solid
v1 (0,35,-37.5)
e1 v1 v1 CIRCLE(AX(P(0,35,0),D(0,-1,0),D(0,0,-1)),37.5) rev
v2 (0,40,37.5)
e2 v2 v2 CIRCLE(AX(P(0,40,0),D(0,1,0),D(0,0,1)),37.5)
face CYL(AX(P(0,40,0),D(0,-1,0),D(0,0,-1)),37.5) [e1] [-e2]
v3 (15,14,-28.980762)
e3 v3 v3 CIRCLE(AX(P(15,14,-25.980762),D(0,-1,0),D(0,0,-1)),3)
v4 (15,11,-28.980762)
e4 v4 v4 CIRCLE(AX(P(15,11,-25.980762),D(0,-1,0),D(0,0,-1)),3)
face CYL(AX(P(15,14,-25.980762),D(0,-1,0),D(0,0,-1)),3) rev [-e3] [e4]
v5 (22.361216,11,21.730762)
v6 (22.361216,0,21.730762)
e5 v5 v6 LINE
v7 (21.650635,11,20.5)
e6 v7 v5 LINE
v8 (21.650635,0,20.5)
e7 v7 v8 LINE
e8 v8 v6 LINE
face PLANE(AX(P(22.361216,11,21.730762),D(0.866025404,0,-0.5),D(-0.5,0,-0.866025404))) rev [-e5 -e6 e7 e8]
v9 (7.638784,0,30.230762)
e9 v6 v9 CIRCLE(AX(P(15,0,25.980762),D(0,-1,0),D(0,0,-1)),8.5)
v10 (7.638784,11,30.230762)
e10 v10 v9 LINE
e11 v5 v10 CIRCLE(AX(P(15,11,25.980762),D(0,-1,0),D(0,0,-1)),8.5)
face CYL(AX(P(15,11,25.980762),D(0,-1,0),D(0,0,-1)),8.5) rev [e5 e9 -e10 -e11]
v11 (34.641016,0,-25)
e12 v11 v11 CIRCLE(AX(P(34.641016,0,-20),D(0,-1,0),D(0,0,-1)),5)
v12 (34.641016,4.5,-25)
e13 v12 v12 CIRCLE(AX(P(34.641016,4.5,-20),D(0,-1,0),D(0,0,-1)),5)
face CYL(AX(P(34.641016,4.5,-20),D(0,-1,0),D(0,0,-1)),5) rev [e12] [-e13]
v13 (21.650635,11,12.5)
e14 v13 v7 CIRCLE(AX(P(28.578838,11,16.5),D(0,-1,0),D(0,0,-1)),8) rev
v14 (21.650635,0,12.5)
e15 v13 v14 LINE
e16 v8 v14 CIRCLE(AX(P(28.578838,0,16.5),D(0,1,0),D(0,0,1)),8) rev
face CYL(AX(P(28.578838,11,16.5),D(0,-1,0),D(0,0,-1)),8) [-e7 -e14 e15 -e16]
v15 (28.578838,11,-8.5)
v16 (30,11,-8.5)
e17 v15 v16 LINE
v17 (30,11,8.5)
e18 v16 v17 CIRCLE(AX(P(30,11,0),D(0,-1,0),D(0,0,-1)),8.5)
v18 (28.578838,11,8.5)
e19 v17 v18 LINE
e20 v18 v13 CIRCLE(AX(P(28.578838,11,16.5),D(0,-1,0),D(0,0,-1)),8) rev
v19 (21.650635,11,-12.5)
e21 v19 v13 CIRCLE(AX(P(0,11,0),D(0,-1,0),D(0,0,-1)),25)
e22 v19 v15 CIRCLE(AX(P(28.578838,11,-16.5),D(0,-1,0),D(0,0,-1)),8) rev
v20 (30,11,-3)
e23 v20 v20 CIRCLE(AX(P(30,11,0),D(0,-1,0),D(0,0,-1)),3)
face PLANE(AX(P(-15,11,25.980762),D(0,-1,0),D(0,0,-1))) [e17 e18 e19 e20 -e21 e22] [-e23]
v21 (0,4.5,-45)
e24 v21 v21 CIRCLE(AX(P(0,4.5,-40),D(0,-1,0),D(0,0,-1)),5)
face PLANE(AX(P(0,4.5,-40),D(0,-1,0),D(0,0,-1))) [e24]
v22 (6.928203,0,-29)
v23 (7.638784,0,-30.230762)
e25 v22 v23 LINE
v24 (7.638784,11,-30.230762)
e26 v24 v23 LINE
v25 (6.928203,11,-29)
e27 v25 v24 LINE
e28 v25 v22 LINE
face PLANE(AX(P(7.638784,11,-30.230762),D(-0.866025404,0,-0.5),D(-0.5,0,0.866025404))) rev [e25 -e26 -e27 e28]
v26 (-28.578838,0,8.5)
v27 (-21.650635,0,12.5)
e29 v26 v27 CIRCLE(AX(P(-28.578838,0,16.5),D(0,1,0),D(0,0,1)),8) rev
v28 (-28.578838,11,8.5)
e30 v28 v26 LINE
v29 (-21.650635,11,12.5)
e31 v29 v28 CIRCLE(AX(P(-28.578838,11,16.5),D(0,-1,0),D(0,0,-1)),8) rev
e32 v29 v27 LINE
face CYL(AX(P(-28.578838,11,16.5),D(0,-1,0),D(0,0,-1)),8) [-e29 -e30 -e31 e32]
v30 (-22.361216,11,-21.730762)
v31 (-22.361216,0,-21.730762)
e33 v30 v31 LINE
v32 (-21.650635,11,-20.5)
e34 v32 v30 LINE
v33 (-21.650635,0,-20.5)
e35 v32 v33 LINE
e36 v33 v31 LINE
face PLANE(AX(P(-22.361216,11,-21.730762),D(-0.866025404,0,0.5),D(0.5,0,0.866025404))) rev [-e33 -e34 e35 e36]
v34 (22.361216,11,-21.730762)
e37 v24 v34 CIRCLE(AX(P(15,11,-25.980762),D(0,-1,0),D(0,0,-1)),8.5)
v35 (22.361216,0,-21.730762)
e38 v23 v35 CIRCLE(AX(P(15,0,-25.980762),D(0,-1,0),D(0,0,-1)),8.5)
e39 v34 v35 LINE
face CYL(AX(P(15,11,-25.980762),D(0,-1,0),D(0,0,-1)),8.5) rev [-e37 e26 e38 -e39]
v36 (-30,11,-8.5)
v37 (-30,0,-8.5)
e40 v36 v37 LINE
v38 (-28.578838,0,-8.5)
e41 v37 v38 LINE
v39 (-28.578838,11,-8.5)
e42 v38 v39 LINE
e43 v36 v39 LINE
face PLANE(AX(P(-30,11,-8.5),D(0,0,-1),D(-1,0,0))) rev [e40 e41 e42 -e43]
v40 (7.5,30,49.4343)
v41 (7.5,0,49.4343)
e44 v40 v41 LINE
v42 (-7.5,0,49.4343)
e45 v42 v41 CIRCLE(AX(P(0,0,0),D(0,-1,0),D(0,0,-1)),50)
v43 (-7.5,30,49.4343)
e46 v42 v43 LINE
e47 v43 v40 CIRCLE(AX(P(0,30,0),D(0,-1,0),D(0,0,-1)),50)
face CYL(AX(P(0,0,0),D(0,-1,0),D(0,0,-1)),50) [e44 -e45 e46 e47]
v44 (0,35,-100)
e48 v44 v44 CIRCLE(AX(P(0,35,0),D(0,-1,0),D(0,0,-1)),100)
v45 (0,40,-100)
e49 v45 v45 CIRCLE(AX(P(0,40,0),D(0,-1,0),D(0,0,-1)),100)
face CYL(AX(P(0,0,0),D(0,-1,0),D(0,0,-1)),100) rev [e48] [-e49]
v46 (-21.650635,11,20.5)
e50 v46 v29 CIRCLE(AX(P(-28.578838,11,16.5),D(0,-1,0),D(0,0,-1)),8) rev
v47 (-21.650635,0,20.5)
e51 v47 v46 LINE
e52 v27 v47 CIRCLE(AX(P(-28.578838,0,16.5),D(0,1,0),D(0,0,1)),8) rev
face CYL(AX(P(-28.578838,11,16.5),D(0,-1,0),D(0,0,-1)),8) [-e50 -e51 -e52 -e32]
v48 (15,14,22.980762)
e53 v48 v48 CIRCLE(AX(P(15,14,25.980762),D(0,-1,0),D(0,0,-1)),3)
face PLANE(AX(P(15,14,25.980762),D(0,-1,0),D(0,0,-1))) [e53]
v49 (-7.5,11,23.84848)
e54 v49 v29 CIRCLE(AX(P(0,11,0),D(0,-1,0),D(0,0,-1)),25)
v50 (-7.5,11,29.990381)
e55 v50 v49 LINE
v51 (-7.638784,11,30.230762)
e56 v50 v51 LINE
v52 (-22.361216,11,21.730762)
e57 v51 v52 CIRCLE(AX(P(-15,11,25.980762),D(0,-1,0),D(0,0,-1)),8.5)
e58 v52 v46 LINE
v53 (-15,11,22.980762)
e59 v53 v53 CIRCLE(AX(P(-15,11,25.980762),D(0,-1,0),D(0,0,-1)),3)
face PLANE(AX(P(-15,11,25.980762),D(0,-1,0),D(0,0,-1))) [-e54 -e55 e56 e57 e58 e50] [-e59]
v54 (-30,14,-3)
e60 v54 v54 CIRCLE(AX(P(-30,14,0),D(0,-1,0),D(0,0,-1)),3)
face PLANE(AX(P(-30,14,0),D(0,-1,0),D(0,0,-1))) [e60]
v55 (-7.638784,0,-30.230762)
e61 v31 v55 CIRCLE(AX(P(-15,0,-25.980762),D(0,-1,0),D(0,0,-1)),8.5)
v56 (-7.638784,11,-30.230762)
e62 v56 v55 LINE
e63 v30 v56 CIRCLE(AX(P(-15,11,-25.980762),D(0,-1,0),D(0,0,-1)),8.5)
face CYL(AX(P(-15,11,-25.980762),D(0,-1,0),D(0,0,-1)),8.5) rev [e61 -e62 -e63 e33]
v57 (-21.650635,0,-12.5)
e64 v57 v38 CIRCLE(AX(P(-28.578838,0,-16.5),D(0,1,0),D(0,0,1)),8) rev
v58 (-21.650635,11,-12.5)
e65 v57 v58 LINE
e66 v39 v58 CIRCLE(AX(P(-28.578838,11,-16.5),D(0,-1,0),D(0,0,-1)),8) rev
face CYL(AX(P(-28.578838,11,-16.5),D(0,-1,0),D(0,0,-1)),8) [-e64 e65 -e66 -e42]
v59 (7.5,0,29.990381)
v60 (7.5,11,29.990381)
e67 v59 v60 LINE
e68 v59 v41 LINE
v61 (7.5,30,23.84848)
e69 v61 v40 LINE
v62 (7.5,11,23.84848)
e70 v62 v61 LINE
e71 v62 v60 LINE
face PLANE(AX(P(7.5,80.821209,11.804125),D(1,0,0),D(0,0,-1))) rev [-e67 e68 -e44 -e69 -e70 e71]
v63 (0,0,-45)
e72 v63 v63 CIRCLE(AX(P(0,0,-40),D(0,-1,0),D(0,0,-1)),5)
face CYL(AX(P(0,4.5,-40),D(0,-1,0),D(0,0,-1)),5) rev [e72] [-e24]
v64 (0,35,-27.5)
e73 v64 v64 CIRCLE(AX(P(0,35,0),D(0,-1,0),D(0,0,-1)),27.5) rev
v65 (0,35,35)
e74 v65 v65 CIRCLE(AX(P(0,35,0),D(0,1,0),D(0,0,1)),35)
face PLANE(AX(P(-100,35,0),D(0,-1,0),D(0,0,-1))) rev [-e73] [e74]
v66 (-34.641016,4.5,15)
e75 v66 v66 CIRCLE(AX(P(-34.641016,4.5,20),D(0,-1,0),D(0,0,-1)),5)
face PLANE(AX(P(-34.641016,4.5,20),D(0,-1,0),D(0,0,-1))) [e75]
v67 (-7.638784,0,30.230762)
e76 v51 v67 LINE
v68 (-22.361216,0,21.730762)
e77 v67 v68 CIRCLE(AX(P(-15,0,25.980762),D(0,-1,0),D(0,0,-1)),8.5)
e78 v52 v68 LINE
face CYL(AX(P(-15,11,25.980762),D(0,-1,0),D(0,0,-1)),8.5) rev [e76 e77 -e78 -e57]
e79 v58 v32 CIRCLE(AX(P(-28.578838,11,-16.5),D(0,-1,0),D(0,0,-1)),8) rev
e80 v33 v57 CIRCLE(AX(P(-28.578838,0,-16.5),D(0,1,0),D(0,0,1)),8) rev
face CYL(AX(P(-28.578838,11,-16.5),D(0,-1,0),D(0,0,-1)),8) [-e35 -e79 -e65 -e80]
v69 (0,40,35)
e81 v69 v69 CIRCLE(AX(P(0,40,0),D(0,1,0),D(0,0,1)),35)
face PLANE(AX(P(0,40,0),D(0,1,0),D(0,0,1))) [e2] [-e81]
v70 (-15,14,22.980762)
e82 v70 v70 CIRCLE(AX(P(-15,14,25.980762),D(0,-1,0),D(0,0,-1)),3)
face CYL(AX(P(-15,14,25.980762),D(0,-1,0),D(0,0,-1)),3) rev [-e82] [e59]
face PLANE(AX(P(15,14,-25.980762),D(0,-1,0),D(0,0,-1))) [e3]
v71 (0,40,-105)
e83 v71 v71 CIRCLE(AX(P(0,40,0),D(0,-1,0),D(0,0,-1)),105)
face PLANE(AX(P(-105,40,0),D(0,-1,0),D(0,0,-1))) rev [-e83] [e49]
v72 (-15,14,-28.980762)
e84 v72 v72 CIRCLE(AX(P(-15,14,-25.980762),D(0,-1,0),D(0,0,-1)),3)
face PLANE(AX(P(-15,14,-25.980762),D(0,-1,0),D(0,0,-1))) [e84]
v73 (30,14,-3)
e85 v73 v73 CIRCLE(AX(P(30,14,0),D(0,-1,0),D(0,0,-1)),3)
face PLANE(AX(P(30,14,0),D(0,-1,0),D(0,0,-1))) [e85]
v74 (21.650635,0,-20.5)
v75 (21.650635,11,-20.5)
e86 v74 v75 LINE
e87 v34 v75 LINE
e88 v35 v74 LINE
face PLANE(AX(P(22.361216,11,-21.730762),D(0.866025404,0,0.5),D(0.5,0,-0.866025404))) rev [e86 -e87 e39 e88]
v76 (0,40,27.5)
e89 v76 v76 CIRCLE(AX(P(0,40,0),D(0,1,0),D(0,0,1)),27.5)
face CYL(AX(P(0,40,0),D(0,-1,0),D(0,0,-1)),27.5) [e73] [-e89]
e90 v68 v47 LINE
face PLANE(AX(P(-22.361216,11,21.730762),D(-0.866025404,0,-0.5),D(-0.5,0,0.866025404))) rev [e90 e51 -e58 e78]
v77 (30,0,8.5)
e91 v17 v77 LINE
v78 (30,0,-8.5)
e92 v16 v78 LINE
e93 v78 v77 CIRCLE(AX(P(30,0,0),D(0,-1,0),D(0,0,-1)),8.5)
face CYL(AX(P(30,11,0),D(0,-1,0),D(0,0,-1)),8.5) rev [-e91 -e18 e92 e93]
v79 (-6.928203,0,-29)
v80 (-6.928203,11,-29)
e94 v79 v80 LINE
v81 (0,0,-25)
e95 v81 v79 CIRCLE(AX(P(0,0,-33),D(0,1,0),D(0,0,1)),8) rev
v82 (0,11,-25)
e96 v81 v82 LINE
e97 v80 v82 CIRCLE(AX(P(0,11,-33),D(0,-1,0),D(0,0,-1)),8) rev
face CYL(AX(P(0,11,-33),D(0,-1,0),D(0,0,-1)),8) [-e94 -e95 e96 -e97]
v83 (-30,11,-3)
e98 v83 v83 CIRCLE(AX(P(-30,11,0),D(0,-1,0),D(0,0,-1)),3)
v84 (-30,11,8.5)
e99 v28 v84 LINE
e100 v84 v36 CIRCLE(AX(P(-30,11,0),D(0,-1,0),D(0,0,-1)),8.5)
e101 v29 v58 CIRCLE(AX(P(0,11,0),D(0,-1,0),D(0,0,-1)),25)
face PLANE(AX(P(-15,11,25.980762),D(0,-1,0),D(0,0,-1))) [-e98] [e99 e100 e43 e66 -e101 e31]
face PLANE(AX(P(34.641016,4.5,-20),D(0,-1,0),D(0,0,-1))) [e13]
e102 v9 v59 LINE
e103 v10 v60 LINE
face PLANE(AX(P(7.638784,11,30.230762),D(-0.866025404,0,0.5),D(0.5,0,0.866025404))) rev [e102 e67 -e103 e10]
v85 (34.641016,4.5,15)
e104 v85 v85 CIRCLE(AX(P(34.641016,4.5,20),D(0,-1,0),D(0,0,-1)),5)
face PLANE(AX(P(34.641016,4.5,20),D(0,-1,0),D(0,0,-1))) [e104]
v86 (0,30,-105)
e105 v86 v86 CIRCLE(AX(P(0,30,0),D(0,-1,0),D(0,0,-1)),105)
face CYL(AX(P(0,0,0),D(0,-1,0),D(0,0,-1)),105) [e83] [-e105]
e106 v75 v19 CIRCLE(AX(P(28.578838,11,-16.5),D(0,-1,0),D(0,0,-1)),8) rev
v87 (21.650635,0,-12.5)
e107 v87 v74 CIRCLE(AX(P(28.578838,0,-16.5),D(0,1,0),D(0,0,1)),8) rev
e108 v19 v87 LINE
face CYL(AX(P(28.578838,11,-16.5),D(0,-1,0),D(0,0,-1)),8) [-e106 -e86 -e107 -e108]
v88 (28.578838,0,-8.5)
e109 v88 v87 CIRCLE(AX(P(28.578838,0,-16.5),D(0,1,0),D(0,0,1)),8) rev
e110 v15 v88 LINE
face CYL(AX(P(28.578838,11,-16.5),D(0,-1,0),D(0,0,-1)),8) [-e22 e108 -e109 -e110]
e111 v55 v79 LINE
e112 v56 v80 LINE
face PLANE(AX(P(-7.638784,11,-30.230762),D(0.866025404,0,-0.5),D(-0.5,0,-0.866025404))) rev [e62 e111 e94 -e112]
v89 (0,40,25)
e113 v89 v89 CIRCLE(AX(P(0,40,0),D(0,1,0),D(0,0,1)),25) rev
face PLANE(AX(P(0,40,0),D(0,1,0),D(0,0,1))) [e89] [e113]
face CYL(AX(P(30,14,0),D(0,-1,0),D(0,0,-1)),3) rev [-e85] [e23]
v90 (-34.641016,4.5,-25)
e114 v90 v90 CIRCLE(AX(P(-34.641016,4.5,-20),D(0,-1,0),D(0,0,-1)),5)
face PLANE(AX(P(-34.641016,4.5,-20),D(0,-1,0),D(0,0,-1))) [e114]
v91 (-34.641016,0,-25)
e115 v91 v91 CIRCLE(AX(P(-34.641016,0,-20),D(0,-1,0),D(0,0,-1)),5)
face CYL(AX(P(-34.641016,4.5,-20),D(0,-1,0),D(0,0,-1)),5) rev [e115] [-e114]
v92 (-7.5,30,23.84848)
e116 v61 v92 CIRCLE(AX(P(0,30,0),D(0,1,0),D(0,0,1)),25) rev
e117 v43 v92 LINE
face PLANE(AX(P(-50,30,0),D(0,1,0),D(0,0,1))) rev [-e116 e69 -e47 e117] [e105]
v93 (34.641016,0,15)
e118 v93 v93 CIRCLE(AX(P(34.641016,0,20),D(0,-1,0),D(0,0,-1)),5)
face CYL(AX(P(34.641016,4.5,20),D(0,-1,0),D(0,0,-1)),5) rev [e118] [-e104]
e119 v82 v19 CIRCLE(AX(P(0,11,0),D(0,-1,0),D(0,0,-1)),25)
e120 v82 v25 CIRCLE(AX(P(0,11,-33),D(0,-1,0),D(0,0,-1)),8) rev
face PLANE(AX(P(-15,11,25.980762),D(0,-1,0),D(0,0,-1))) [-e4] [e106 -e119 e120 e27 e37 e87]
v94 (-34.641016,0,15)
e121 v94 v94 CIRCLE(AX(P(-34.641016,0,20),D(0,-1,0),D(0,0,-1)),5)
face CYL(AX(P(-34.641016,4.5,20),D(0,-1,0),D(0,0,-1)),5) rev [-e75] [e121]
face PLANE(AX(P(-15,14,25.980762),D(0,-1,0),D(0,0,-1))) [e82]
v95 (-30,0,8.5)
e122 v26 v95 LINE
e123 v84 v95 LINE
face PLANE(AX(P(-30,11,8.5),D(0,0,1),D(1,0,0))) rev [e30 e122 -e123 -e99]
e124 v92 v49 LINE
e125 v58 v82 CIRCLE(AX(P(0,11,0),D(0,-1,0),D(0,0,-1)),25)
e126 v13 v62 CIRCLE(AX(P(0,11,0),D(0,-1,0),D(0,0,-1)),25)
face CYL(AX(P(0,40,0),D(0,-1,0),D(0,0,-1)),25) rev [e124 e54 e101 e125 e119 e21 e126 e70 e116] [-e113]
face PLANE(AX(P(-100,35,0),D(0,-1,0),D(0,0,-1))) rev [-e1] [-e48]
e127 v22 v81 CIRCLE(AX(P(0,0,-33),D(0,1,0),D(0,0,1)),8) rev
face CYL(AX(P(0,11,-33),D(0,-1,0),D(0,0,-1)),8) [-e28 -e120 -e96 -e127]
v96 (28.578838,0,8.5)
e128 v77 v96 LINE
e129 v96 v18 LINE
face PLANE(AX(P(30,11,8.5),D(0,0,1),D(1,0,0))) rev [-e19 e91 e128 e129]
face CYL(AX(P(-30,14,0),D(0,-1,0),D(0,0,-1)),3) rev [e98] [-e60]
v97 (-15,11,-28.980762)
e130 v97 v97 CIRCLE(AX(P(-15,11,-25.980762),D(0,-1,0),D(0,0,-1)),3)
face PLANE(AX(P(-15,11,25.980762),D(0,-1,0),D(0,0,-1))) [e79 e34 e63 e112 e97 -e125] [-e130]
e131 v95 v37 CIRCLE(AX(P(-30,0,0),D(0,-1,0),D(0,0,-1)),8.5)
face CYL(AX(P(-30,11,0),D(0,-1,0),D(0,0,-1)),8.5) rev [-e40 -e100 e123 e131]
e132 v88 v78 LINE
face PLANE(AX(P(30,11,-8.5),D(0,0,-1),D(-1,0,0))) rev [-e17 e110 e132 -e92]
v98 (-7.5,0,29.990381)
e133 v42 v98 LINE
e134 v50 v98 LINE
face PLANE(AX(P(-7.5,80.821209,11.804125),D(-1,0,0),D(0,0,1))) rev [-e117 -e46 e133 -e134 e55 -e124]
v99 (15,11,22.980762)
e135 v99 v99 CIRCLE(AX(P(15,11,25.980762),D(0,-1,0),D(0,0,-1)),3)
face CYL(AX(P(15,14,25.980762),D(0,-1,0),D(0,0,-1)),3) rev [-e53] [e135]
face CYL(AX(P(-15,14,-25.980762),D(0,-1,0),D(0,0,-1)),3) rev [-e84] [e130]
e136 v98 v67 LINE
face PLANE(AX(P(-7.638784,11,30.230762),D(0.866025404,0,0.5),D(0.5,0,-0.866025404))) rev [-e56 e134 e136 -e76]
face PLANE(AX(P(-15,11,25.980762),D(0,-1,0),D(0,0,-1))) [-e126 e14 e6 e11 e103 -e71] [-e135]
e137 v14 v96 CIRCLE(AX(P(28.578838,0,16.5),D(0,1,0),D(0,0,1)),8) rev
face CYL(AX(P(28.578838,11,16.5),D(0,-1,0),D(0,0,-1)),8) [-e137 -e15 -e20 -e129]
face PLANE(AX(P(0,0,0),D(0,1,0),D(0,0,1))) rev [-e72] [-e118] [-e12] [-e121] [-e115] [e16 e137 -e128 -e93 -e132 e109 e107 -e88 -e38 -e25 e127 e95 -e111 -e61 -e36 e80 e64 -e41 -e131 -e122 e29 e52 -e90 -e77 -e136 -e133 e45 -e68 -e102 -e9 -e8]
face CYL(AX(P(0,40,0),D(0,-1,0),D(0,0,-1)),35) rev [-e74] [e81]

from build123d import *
from build123d.topology import SkipClean

# Parameters (mm, degrees)
CUT_EXTRUDE1_DEPTH  = 11
FILLET1_R           = 8
SKETCH3_R           = 3
CUT_EXTRUDE2_DEPTH  = 3
SKETCH4_R           = 5
CUT_EXTRUDE3_DEPTH  = 4.5
SKETCH5_R           = 25
CUT_EXTRUDE4_DEPTH  = 152.297719745
SKETCH6_R           = 37.5
SKETCH6_R_2         = 35
SKETCH6_R_3         = 27.5
SKETCH6_R_4         = 25
BOSS_EXTRUDE1_DEPTH = 5
CUT_EXTRUDE5_START  = -30
CUT_EXTRUDE5_DEPTH  = 30


# Read off the part's stored shape, not the designer's step: Cut-Extrude5
with BuildPart() as part:
    # Sketch1 → Revolve1 (revolve)
    with BuildSketch(Plane.XY, mode=Mode.PRIVATE) as revolve1_sk:
        Polygon((0, 0), (-50, 0), (-50, 30), (-105, 30), (-105, 40), (-100, 40), (-100, 35), (0, 35), align=None)
    revolve(revolve1_sk.sketch.rotate(Axis((0, 0, 0), (0, 1, 0)), 270), axis=Axis((0, 0, 0), (0, 1, 0)))

    # Sketch2 → Cut-Extrude1 (cut)
    with BuildSketch(Plane.XZ):
        with BuildLine():
            Line((-22.361215932, 21.730762114), (-19.116533878, 16.110807941))
            ThreePointArc((-19.116533878, 16.110807941), (-21.650635095, 12.5), (-23.510635891, 8.5))
            Line((-23.510635891, 8.5), (-30, 8.5))
            ThreePointArc((-30, 8.5), (-38.5, 0), (-30, -8.5))
            Line((-30, -8.5), (-23.510635891, -8.5))
            ThreePointArc((-23.510635891, -8.5), (-21.650635095, -12.5), (-19.116533878, -16.110807941))
            Line((-19.116533878, -16.110807941), (-22.361215932, -21.730762114))
            ThreePointArc((-22.361215932, -21.730762114), (-19.25, -33.341978046), (-7.638784068, -30.230762114))
            Line((-7.638784068, -30.230762114), (-4.394102013, -24.610807941))
            ThreePointArc((-4.394102013, -24.610807941), (0, -25), (4.394102013, -24.610807941))
            Line((4.394102013, -24.610807941), (7.638784068, -30.230762114))
            ThreePointArc((7.638784068, -30.230762114), (19.25, -33.341978046), (22.361215932, -21.730762114))
            Line((22.361215932, -21.730762114), (19.116533878, -16.110807941))
            ThreePointArc((19.116533878, -16.110807941), (21.650635095, -12.5), (23.510635891, -8.5))
            Line((23.510635891, -8.5), (30, -8.5))
            ThreePointArc((30, -8.5), (38.5, 0), (30, 8.5))
            Line((30, 8.5), (23.510635891, 8.5))
            ThreePointArc((23.510635891, 8.5), (21.650635095, 12.5), (19.116533878, 16.110807941))
            Line((19.116533878, 16.110807941), (22.361215932, 21.730762114))
            ThreePointArc((22.361215932, 21.730762114), (19.25, 33.341978046), (7.638784068, 30.230762114))
            Line((7.638784068, 30.230762114), (4.394102013, 24.610807941))
            ThreePointArc((4.394102013, 24.610807941), (0, 25), (-4.394102013, 24.610807941))
            Line((-4.394102013, 24.610807941), (-7.638784068, 30.230762114))
            ThreePointArc((-7.638784068, 30.230762114), (-19.25, 33.341978046), (-22.361215932, 21.730762114))
        make_face()
    extrude(amount=-CUT_EXTRUDE1_DEPTH, mode=Mode.SUBTRACT)

    # Fillet1
    fillet1_edges = [part.edges().sort_by_distance(p)[0] for p in [
        (23.510635891, 5.5, -8.5),
        (19.116533878, 5.5, -16.110807941),
        (-4.394102013, 5.5, -24.610807941),
        (4.394102013, 5.5, -24.610807941),
        (-23.510635891, 5.5, -8.5),
        (-19.116533878, 5.5, -16.110807941),
        (19.116533878, 5.5, 16.110807941),
        (23.510635891, 5.5, 8.5),
        (4.394102013, 5.5, 24.610807941),
        (-4.394102013, 5.5, 24.610807941),
        (-23.510635891, 5.5, 8.5),
        (-19.116533878, 5.5, 16.110807941),
    ]]
    fillet(fillet1_edges, radius=FILLET1_R - 0.0001)  # a hair under: the kernel refuses the full size

    # Sketch3 → Cut-Extrude2 (cut)
    with BuildSketch(Plane.XZ.offset(-11)):
        with Locations(Location((-15, 25.980762114, 0), (0, 0, 270))):
            Circle(SKETCH3_R)
        with Locations(Location((15, 25.980762114, 0), (0, 0, 270))):
            Circle(SKETCH3_R)
        with Locations(Location((30, 0, 0), (0, 0, 270))):
            Circle(SKETCH3_R)
        with Locations(Location((15, -25.980762114, 0), (0, 0, 270))):
            Circle(SKETCH3_R)
        with Locations(Location((-15, -25.980762114, 0), (0, 0, 270))):
            Circle(SKETCH3_R)
        with Locations(Location((-30, 0, 0), (0, 0, 270))):
            Circle(SKETCH3_R)
    extrude(amount=-CUT_EXTRUDE2_DEPTH, mode=Mode.SUBTRACT)

    # Sketch4 → Cut-Extrude3 (cut)
    with BuildSketch(Plane.XZ):
        with Locations(Location((-34.641016151, -20, 0), (0, 0, 270))):
            Circle(SKETCH4_R)
        with Locations(Location((-34.641016151, 20, 0), (0, 0, 270))):
            Circle(SKETCH4_R)
        with Locations(Location((0, 40, 0), (0, 0, 270))):
            Circle(SKETCH4_R)
        with Locations(Location((34.641016151, 20, 0), (0, 0, 270))):
            Circle(SKETCH4_R)
        with Locations(Location((34.641016151, -20, 0), (0, 0, 270))):
            Circle(SKETCH4_R)
        with Locations(Location((0, -40, 0), (0, 0, 270))):
            Circle(SKETCH4_R)
    extrude(amount=-CUT_EXTRUDE3_DEPTH, mode=Mode.SUBTRACT)

    # Sketch5 → Cut-Extrude4 (cut, through all)
    with BuildSketch(Plane.XZ.offset(-11)):
        with Locations(Location((0, 0, 0), (0, 0, 270))):
            Circle(SKETCH5_R)
    extrude(amount=-CUT_EXTRUDE4_DEPTH, mode=Mode.SUBTRACT)

    # Sketch6 → Boss-Extrude1 (add)
    # profile 1 of 2: a face of its own
    with SkipClean():  # the faces are left unmerged after this step: merging them gives an invalid solid
        with BuildSketch(Plane(origin=(0, 35, 0), x_dir=(1, 0, 0), z_dir=(0, 1, 0))):
            with Locations(Location((0, 0, 0), (0, 0, 90))):
                Circle(SKETCH6_R)
            with Locations(Location((0, 0, 0), (0, 0, 270))):
                Circle(SKETCH6_R_2, mode=Mode.SUBTRACT)
        # profile 2 of 2: a face of its own
        with BuildSketch(Plane(origin=(0, 35, 0), x_dir=(1, 0, 0), z_dir=(0, 1, 0))):
            with Locations(Location((0, 0, 0), (0, 0, 90))):
                Circle(SKETCH6_R_3)
            with Locations(Location((0, 0, 0), (0, 0, 270))):
                Circle(SKETCH6_R_4, mode=Mode.SUBTRACT)
        extrude(amount=BOSS_EXTRUDE1_DEPTH)
    add(part.part.scale(1), mode=Mode.REPLACE)  # the faces are merged on a copy

    # Cut-Extrude5 outline → Cut-Extrude5 (cut)
    with BuildSketch(Plane.XZ.offset(CUT_EXTRUDE5_START)):
        with BuildLine():
            Line((7.5, 23.848480035), (7.5, 49.434299833))
            ThreePointArc((7.5, 49.434299833), (0, 50), (-7.5, 49.434299833))
            Line((-7.5, 49.434299833), (-7.5, 23.848480035))
            ThreePointArc((-7.5, 23.848480035), (0, 25), (7.5, 23.848480035))
        make_face()
    extrude(amount=CUT_EXTRUDE5_DEPTH, mode=Mode.SUBTRACT)


solid = part.part
